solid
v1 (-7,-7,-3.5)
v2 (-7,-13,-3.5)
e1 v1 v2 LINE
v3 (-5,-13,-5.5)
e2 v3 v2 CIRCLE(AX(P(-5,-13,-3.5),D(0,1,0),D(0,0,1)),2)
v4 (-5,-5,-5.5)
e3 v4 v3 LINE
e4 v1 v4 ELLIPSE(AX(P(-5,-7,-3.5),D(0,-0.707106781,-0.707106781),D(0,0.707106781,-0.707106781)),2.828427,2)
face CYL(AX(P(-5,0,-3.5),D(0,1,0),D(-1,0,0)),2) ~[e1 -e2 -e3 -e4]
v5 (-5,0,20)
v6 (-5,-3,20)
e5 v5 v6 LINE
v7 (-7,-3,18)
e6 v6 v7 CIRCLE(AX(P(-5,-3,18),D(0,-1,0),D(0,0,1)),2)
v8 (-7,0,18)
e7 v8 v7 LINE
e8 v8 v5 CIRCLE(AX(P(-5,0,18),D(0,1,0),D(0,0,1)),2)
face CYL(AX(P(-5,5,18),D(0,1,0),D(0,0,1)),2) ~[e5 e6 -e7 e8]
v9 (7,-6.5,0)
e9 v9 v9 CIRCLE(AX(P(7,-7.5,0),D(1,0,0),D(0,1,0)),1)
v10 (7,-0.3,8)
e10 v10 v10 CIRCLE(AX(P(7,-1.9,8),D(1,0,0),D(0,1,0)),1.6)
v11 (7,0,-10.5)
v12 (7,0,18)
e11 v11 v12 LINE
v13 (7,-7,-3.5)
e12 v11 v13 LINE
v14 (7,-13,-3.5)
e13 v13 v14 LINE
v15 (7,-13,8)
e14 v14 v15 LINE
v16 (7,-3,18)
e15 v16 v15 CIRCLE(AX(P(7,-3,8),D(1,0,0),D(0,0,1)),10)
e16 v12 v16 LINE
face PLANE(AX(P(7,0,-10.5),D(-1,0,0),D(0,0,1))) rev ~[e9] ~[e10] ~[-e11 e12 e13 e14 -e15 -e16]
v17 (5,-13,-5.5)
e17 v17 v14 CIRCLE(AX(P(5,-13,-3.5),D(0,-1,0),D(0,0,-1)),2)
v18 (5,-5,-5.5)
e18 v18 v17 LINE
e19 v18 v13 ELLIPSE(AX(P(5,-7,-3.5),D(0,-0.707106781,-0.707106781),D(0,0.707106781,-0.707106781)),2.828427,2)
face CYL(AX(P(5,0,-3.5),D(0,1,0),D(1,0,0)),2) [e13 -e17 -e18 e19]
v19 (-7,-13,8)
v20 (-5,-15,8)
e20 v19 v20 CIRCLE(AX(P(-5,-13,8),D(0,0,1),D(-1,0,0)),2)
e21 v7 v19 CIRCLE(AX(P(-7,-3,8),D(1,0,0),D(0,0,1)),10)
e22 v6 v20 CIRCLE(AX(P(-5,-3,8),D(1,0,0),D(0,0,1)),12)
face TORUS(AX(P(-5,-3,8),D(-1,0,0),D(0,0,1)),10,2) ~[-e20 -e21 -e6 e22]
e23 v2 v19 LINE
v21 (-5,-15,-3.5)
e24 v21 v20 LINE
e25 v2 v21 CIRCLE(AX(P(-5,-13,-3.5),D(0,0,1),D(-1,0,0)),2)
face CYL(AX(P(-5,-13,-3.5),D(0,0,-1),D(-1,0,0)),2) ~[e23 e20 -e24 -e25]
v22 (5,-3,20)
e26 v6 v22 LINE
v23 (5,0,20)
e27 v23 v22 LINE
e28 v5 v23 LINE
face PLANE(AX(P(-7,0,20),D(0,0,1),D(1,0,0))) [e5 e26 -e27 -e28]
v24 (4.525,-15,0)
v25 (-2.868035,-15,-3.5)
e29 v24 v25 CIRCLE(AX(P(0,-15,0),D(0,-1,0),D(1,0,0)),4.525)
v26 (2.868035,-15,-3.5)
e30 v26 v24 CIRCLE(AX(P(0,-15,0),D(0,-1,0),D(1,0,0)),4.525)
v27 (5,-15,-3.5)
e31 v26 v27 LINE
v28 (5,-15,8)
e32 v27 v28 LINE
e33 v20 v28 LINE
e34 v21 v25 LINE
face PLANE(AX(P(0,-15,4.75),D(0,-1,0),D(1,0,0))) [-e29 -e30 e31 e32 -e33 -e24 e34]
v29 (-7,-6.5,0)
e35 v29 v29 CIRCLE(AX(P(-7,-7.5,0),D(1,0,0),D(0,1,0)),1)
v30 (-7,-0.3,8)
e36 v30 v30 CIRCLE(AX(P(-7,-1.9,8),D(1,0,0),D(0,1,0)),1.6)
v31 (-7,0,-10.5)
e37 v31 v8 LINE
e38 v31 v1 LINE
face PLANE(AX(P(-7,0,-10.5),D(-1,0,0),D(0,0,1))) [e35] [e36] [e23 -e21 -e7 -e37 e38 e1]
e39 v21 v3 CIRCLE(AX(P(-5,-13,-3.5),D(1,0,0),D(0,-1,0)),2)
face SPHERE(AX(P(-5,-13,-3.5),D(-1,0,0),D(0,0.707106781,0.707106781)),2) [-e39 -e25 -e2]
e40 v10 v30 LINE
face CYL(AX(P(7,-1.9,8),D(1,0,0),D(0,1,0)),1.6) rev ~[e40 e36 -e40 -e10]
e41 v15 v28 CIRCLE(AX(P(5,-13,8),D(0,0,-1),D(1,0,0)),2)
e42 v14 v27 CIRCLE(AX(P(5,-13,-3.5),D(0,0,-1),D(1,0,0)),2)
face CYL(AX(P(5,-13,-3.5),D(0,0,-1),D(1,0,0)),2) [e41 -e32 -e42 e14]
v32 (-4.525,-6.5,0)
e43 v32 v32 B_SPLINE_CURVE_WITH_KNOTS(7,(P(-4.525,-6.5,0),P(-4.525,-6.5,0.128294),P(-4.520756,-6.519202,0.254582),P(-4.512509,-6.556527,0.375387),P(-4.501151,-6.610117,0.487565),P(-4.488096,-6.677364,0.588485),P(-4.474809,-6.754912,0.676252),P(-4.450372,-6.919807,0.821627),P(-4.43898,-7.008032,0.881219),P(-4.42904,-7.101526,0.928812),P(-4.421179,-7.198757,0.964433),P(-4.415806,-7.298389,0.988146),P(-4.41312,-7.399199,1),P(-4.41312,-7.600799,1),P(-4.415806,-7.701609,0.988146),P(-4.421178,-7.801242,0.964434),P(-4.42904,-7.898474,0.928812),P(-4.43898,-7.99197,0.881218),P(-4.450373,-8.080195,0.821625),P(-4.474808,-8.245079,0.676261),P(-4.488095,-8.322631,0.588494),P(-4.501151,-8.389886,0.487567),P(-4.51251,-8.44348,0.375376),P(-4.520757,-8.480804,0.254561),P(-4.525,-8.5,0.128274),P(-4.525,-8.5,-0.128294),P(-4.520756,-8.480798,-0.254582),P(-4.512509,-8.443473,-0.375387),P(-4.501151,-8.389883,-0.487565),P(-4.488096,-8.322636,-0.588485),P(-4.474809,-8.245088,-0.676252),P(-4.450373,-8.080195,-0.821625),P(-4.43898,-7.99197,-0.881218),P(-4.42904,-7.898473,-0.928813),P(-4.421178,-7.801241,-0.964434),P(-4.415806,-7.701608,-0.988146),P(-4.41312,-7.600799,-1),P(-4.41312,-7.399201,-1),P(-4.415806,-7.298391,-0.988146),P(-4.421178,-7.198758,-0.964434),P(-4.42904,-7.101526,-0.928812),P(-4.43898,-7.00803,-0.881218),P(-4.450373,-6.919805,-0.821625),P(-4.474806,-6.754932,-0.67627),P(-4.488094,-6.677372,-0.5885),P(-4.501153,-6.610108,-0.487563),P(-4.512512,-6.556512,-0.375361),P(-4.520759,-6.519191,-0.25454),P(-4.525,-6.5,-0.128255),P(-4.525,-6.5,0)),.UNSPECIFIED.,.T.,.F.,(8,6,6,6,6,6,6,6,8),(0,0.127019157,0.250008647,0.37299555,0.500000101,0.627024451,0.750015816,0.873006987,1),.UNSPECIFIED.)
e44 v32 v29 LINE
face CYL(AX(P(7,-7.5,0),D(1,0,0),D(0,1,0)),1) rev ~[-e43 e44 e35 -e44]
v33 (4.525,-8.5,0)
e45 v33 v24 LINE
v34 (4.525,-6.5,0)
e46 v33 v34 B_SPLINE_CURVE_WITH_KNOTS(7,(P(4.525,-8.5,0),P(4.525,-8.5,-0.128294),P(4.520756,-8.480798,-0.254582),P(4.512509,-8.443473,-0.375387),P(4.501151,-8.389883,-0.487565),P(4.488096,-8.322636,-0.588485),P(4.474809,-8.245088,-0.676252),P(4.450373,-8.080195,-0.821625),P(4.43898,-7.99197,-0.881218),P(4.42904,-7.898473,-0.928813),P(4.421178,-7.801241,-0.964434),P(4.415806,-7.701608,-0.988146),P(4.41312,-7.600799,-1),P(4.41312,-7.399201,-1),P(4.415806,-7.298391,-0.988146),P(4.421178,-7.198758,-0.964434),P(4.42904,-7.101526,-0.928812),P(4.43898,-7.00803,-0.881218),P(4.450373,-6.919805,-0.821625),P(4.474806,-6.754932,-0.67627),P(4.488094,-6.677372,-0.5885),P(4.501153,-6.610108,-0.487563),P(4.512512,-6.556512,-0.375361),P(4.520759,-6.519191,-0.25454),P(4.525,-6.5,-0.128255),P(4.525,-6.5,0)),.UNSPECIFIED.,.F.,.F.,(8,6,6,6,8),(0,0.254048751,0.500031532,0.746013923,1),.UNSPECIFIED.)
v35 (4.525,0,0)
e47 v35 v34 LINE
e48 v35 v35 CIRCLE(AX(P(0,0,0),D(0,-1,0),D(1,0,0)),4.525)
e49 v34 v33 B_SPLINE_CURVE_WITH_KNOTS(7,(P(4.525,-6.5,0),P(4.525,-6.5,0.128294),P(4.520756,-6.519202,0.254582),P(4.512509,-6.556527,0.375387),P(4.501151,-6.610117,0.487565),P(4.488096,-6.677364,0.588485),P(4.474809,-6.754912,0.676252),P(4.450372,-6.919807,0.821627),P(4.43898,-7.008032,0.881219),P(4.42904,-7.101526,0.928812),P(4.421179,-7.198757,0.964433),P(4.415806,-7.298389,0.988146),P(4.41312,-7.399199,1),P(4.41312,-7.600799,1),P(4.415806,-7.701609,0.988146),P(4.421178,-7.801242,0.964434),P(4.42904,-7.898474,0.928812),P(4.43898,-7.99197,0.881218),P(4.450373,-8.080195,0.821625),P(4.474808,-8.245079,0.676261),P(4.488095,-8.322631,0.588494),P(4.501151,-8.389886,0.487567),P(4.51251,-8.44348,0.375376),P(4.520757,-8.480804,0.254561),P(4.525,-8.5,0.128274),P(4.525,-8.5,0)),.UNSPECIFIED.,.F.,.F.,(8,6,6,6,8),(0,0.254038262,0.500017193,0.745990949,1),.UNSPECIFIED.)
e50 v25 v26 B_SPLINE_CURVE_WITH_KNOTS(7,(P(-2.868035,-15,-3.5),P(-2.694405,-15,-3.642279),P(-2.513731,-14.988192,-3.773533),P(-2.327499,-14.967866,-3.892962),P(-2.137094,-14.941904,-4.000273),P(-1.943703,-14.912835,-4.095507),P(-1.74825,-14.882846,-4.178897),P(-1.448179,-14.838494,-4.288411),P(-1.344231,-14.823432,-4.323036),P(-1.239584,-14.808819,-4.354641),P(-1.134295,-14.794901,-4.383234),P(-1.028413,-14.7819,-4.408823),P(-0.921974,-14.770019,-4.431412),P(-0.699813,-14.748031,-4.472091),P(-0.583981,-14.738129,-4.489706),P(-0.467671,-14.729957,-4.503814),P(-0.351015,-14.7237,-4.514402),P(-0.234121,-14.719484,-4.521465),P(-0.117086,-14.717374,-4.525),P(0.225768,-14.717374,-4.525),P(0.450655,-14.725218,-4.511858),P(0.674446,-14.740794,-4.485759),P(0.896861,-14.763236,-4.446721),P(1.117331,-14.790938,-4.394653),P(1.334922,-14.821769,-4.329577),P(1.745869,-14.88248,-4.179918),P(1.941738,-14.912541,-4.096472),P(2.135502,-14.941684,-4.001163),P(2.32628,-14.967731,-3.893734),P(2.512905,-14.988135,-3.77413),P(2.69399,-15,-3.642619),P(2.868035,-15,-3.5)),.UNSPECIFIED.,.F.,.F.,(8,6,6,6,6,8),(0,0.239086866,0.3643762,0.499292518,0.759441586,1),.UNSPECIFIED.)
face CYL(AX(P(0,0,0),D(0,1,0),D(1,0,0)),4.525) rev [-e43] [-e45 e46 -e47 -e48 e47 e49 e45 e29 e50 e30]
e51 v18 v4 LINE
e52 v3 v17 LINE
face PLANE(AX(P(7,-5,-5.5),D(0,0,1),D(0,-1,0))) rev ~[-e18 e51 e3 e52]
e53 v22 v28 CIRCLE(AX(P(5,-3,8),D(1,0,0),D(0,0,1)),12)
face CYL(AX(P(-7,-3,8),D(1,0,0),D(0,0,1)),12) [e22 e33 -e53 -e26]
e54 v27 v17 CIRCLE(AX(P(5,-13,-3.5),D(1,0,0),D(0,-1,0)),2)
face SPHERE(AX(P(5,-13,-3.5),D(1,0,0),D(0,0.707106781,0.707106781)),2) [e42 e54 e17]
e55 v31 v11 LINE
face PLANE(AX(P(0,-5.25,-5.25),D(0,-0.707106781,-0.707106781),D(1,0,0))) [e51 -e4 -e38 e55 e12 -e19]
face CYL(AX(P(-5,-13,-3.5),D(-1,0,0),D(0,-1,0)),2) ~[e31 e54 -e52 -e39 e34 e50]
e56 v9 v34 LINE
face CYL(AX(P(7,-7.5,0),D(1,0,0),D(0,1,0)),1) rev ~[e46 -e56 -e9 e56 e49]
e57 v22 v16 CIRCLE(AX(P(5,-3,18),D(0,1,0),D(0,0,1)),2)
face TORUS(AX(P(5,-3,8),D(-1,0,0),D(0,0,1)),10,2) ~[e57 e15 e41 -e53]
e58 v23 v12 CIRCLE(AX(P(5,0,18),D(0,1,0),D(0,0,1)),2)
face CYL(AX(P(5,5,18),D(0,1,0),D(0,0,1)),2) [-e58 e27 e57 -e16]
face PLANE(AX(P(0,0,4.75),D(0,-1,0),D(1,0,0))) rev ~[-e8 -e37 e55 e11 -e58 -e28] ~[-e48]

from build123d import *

# Parameters (mm, degrees)
F0_W         = 14
F0_H         = 30.5
F0_R         = 4.525
F1_DEPTH     = 15
F3_DEPTH     = 14.001
F4_R         = 1.6
F4_R_2       = 1
F5_DEPTH     = 14.001
F6_R         = 12
F7_T1_DEPTH  = 10
F7_T3_DEPTH  = 11.5
F7_T5_DEPTH  = 8
F7_S9_W      = 2
F7_S9_H      = 2
F7_T10_DEPTH = 2
F7_S15_W     = 2
F7_S15_H     = 2
F7_T16_DEPTH = 2
F7_T22_DEPTH = 13
F7_T25_ANGLE = 90
F7_T29_DEPTH = 13
F7_T32_ANGLE = 90


# Not quite as in the source:
# - a fillet or chamfer that OpenCascade refuses, or shapes differently, is made with other operations: its cross-section is extruded or revolved along the edge and cut away or added


with BuildPart() as f1:
    # F0 (on Front) → F1 (new body)
    with BuildSketch(Plane.XZ):
        with Locations((0, 4.75)):
            Rectangle(F0_W, F0_H)
        Circle(F0_R, mode=Mode.SUBTRACT)
    extrude(amount=F1_DEPTH)

    # F2 (on face) → F3 (cut, through all)
    with BuildSketch(Plane.YZ.offset(7)):
        Polygon((-15, -10.5), (0, -10.5), (-5, -5.5), (-15, -5.5), align=None)
    extrude(amount=-F3_DEPTH, mode=Mode.SUBTRACT)

    # F4 (on face) → F5 (cut, through all)
    with BuildSketch(Plane.YZ.offset(7)):
        with Locations((-1.9, 8)):
            Circle(F4_R)
        with Locations((-7.5, 0)):
            Circle(F4_R_2)
    extrude(amount=-F5_DEPTH, mode=Mode.SUBTRACT)

    # F6
    f6_edges = [f1.edges().sort_by_distance(p)[0] for p in [
        (0, -15, 20),
    ]]
    fillet(f6_edges, radius=F6_R)

    # F7: fillet of radius 2 on 9 edges, made by hand

    # F7_s2 → F7_t1 (cut)
    with BuildSketch(Plane.YZ.offset(-5)):
        with BuildLine():
            ThreePointArc((-15, -3.5), (-14.4142135624, -4.9142135624), (-13, -5.5))
            Line((-13, -5.5), (-15, -5.5))
            Line((-15, -5.5), (-15, -3.5))
        make_face()
    extrude(amount=F7_T1_DEPTH, mode=Mode.SUBTRACT)

    # F7_s4 → F7_t3 (cut)
    with BuildSketch(Plane.XY.offset(-3.5)):
        with BuildLine():
            ThreePointArc((7, -13), (6.4142135624, -14.4142135624), (5, -15))
            Line((5, -15), (7, -15))
            Line((7, -15), (7, -13))
        make_face()
        with BuildLine():
            ThreePointArc((-7, -13), (-6.4142135624, -14.4142135624), (-5, -15))
            Line((-5, -15), (-7, -15))
            Line((-7, -15), (-7, -13))
        make_face()
    extrude(amount=F7_T3_DEPTH, mode=Mode.SUBTRACT)

    # F7_s6 → F7_t5 (cut)
    with BuildSketch(Plane.XZ.offset(-5)):
        with BuildLine():
            ThreePointArc((5, 20), (6.4142135624, 19.4142135624), (7, 18))
            Line((7, 18), (7, 20))
            Line((7, 20), (5, 20))
        make_face()
        with BuildLine():
            ThreePointArc((-5, 20), (-6.4142135624, 19.4142135624), (-7, 18))
            Line((-7, 18), (-7, 20))
            Line((-7, 20), (-5, 20))
        make_face()
    extrude(amount=F7_T5_DEPTH, mode=Mode.SUBTRACT)


with BuildPart() as f7_tool8:
    # F7_s9 → F7_t10 (new body)
    with BuildSketch(Plane.YZ.offset(5)):
        with Locations((-14, -4.5)):
            Rectangle(F7_S9_W, F7_S9_H)
    extrude(amount=F7_T10_DEPTH)

    # F7_s11 → F7_t12 (revolve, cut)
    with BuildSketch(Plane(origin=(5, -13, -3.5), x_dir=(0, 0.7071067812, 0.7071067812), z_dir=(0, 0.7071067812, -0.7071067812))):
        with BuildLine():
            ThreePointArc((0, -2), (2, 0), (0, 2))
            Line((0, 2), (0, -2))
        make_face()
    revolve(axis=Axis((5, -13, -3.5), (1, 0, 0)), mode=Mode.SUBTRACT)


with BuildPart() as f1_1:
    add(f1.part)

    # F7_t7: cut F7_tool8
    add(f7_tool8.part, mode=Mode.SUBTRACT)


with BuildPart() as f7_tool14:
    # F7_s15 → F7_t16 (new body)
    with BuildSketch(Plane.YZ.offset(-5)):
        with Locations((-14, -4.5)):
            Rectangle(F7_S15_W, F7_S15_H)
    extrude(amount=-F7_T16_DEPTH)

    # F7_s17 → F7_t18 (revolve, cut)
    with BuildSketch(Plane(origin=(-5, -13, -3.5), x_dir=(0, 0.7071067812, 0.7071067812), z_dir=(0, -0.7071067812, 0.7071067812))):
        with BuildLine():
            ThreePointArc((0, -2), (2, 0), (0, 2))
            Line((0, 2), (0, -2))
        make_face()
    revolve(axis=Axis((-5, -13, -3.5), (-1, 0, 0)), mode=Mode.SUBTRACT)


with BuildPart() as f1_2:
    add(f1_1.part)

    # F7_t13: cut F7_tool14
    add(f7_tool14.part, mode=Mode.SUBTRACT)


with BuildPart() as f7_tool20:
    # F7_s21 → F7_t22 (new body)
    with BuildSketch(Plane.XZ):
        with BuildLine():
            ThreePointArc((-7, -3.5), (-6.4142135624, -4.9142135624), (-5, -5.5))
            Line((-5, -5.5), (-7, -5.5))
            Line((-7, -5.5), (-7, -3.5))
        make_face()
    extrude(amount=F7_T22_DEPTH)

    split(bisect_by=Plane(origin=(0, -5.25, -5.25), x_dir=(1, 0, 0), z_dir=(0, -0.7071067812, -0.7071067812)), keep=Keep.TOP)


with BuildPart() as f1_3:
    add(f1_2.part)

    # F7_t19: cut F7_tool20
    add(f7_tool20.part, mode=Mode.SUBTRACT)

    # F7_s24 → F7_t25 (revolve, cut)
    with BuildSketch(Plane.XZ.offset(3)):
        with BuildLine():
            ThreePointArc((-5, 20), (-6.4142135624, 19.4142135624), (-7, 18))
            Line((-7, 18), (-7, 20))
            Line((-7, 20), (-5, 20))
        make_face()
    revolve(axis=Axis((-7, -3, 8), (1, 0, 0)), revolution_arc=F7_T25_ANGLE, mode=Mode.SUBTRACT)


with BuildPart() as f7_tool27:
    # F7_s28 → F7_t29 (new body)
    with BuildSketch(Plane.XZ):
        with BuildLine():
            ThreePointArc((7, -3.5), (6.4142135624, -4.9142135624), (5, -5.5))
            Line((5, -5.5), (7, -5.5))
            Line((7, -5.5), (7, -3.5))
        make_face()
    extrude(amount=F7_T29_DEPTH)

    split(bisect_by=Plane(origin=(0, -5.25, -5.25), x_dir=(1, 0, 0), z_dir=(0, -0.7071067812, -0.7071067812)), keep=Keep.TOP)


with BuildPart() as f1_4:
    add(f1_3.part)

    # F7_t26: cut F7_tool27
    add(f7_tool27.part, mode=Mode.SUBTRACT)

    # F7_s31 → F7_t32 (revolve, cut)
    with BuildSketch(Plane.XZ.offset(3)):
        with BuildLine():
            ThreePointArc((7, 18), (6.4142135624, 19.4142135624), (5, 20))
            Line((5, 20), (7, 20))
            Line((7, 20), (7, 18))
        make_face()
    revolve(axis=Axis((7, -3, 8), (1, 0, 0)), revolution_arc=F7_T32_ANGLE, mode=Mode.SUBTRACT)


solid = f1_4.part
